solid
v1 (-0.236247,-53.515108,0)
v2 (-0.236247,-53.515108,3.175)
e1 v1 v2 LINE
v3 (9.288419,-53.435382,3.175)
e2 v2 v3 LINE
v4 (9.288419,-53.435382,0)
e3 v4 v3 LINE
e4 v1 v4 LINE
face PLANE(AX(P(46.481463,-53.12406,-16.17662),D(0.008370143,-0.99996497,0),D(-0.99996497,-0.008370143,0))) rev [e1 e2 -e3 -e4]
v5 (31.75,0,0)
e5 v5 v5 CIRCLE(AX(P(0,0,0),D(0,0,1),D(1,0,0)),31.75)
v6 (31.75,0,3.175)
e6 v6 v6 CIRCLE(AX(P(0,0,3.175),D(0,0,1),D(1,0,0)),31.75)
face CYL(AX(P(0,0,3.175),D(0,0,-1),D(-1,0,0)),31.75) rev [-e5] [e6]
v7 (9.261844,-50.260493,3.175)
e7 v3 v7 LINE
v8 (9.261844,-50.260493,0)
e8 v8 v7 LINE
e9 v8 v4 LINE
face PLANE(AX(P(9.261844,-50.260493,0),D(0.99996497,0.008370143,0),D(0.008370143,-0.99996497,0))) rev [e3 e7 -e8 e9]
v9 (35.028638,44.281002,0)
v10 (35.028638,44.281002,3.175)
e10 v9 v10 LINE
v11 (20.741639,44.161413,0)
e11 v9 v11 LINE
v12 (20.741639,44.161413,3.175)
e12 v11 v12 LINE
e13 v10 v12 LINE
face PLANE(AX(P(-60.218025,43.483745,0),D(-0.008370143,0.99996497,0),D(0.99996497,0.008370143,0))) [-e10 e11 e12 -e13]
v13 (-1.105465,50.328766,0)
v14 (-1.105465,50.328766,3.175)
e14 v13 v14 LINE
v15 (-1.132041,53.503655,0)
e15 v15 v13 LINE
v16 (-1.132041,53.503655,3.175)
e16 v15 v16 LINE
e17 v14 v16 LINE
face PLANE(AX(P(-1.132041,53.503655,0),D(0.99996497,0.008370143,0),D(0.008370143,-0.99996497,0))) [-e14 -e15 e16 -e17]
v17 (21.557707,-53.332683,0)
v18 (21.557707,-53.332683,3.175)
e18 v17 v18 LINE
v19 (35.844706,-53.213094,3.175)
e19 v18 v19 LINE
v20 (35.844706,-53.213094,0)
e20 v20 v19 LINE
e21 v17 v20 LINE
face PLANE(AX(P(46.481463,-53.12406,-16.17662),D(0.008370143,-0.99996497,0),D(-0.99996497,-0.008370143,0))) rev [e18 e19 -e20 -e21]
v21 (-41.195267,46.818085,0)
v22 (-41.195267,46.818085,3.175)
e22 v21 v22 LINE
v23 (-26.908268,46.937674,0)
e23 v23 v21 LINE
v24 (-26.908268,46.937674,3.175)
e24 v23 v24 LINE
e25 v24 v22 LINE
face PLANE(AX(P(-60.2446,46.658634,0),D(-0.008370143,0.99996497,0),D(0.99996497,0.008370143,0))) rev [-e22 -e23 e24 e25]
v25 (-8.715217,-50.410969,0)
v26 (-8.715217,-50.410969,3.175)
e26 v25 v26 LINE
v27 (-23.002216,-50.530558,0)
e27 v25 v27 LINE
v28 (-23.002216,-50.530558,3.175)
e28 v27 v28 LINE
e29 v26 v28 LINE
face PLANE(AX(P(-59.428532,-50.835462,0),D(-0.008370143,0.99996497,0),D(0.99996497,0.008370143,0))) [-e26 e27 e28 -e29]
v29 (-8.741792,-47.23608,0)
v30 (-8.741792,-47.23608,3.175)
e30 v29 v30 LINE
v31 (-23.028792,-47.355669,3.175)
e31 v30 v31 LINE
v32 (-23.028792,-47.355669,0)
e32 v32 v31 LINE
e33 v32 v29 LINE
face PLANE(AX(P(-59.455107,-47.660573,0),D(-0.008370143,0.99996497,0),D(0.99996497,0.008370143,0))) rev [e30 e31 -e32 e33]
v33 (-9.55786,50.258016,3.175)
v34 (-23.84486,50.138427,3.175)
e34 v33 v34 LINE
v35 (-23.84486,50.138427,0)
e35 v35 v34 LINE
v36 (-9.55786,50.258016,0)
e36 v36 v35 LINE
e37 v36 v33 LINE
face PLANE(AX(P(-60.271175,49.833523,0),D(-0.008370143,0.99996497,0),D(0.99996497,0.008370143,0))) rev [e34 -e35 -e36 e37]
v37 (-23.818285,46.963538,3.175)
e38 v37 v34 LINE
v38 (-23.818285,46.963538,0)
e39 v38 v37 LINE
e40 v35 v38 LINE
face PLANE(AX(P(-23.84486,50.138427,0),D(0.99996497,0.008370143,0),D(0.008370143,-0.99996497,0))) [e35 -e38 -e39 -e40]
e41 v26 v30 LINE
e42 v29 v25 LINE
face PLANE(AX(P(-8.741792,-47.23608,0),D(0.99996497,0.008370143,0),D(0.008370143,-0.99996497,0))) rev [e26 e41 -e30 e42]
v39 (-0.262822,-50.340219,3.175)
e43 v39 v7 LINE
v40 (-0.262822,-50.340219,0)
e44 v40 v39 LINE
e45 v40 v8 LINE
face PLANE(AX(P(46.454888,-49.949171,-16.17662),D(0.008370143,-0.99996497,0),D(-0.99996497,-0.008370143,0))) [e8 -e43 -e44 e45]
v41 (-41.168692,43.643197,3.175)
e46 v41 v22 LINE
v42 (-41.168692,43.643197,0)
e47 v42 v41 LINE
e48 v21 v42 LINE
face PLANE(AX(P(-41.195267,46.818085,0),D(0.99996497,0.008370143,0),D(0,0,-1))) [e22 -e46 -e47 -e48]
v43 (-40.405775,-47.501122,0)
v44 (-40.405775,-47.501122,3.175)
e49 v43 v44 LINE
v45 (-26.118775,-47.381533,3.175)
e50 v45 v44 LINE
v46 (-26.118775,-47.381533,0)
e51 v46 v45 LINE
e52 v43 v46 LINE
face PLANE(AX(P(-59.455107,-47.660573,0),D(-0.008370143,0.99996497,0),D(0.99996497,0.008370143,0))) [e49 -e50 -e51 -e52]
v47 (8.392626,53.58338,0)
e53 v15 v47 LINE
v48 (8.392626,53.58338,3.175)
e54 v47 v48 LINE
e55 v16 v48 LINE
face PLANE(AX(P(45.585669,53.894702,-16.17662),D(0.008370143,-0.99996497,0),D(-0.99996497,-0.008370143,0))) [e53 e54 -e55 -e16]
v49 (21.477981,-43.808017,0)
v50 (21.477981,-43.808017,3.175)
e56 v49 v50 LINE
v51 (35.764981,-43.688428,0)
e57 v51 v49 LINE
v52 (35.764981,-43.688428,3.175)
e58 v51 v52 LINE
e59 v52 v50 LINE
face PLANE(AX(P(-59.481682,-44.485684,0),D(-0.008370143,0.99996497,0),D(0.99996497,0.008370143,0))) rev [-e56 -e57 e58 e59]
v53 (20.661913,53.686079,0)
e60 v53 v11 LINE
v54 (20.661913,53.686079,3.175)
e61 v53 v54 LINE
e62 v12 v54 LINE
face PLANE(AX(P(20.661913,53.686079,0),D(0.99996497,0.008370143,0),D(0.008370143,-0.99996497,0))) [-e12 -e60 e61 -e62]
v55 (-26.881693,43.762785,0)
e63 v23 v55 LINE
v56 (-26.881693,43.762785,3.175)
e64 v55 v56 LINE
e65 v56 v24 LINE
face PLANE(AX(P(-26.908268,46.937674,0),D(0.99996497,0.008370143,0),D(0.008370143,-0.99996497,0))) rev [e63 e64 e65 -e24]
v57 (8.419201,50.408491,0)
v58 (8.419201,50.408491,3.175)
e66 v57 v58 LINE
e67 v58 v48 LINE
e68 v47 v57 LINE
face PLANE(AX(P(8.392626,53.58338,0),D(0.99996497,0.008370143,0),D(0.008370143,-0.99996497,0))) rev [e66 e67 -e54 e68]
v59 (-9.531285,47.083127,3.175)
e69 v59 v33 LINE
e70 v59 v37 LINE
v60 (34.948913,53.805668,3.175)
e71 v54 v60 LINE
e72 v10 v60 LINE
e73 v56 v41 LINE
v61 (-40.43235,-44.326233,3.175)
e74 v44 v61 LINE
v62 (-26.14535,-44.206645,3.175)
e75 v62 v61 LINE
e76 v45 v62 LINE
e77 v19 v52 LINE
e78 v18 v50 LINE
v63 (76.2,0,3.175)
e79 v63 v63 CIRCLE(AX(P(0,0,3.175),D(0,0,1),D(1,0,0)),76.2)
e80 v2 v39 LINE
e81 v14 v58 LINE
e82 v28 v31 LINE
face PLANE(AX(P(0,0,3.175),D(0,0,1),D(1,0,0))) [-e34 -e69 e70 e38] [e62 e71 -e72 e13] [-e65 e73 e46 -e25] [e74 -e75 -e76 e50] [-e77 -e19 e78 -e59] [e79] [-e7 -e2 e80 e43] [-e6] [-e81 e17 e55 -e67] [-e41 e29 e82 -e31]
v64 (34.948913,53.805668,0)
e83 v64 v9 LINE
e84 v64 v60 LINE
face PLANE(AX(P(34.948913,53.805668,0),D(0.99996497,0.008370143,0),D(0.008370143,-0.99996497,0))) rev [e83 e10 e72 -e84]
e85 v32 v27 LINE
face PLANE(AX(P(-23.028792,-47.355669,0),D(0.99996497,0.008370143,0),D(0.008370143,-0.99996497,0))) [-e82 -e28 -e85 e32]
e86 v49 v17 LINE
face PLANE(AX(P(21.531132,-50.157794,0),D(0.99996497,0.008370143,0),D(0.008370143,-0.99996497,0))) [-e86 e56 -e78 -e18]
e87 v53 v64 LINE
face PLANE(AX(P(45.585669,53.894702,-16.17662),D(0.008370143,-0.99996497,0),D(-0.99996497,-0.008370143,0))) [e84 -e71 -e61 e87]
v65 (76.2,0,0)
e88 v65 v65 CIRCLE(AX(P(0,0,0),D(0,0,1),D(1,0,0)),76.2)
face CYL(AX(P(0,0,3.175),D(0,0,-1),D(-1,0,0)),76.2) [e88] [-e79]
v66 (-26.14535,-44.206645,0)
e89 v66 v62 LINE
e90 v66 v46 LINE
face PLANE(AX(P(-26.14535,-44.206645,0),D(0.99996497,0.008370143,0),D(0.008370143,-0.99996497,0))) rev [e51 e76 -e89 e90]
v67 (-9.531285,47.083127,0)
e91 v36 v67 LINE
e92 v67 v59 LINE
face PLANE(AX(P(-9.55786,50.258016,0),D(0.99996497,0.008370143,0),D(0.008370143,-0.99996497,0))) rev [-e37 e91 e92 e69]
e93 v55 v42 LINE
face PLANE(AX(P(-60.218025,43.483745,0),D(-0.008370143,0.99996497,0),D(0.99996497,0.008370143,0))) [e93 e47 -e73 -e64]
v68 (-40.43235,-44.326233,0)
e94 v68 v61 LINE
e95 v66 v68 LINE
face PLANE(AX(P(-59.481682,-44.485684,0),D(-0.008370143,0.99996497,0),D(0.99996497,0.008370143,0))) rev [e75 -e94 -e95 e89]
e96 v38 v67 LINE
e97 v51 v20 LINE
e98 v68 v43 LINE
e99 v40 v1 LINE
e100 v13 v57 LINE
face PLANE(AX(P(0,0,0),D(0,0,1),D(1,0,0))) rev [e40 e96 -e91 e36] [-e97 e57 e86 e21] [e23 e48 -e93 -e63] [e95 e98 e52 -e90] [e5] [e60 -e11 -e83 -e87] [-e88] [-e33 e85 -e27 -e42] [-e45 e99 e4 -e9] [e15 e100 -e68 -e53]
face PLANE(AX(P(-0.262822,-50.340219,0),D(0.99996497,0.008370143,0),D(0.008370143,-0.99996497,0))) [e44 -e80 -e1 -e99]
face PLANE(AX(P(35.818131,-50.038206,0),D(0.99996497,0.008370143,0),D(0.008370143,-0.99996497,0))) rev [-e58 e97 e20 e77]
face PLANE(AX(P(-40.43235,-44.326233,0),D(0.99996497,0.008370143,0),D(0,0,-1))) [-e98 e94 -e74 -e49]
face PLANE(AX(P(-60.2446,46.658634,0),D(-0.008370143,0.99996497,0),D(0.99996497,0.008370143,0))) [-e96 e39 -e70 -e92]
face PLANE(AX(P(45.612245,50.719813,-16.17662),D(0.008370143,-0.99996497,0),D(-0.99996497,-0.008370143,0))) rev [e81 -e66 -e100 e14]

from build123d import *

# Parameters (mm, degrees)
SKETCH1_R           = 76.2
SKETCH1_R_2         = 31.75
BOSS_EXTRUDE1_DEPTH = 3.175
CAVITY1_START       = -53.511255689
CAVITY1_OUTLINE_W   = 14.2875
CAVITY1_OUTLINE_H   = 3.175
CAVITY1_DEPTH       = 9.525
CAVITY1_START_2     = 43.986255689
CAVITY1_2_OUTLINE_W = 14.2875
CAVITY1_2_OUTLINE_H = 3.175
CAVITY1_2_DEPTH     = 9.525
CAVITY1_START_3     = -50.336255689
CAVITY1_3_OUTLINE_W = 14.2875
CAVITY1_3_OUTLINE_H = 3.175
CAVITY1_3_DEPTH     = 3.175
CAVITY1_START_4     = -47.161255689
CAVITY1_4_OUTLINE_W = 14.2875
CAVITY1_4_OUTLINE_H = 3.175
CAVITY1_4_DEPTH     = 3.175
CAVITY1_5_OUTLINE_W = 14.2875
CAVITY1_5_OUTLINE_H = 3.175
CAVITY1_5_DEPTH     = 3.175
CAVITY1_START_5     = 47.161255689
CAVITY1_6_OUTLINE_W = 14.2875
CAVITY1_6_OUTLINE_H = 3.175
CAVITY1_6_DEPTH     = 3.175
CAVITY1_7_OUTLINE_W = 9.525
CAVITY1_7_OUTLINE_H = 3.175
CAVITY1_7_DEPTH     = 3.175
CAVITY1_START_6     = 50.336255689
CAVITY1_8_OUTLINE_W = 9.525
CAVITY1_8_OUTLINE_H = 3.175
CAVITY1_8_DEPTH     = 3.175


# Read off the part's stored shape, not the designer's step: Cavity1
with BuildPart() as part:
    # Sketch1 → Boss-Extrude1 (new body)
    with BuildSketch(Plane.XY):
        Circle(SKETCH1_R)
        Circle(SKETCH1_R_2, mode=Mode.SUBTRACT)
    extrude(amount=BOSS_EXTRUDE1_DEPTH)

    # Cavity1 outline → Cavity1 (cut)
    with BuildSketch(Plane(origin=(0, 0, 0), x_dir=(0.9999649697426024, 0.008370142631770718, 0), z_dir=(0.008370142631770716, -0.9999649697426025, 0)).offset(CAVITY1_START)):
        with Locations((28.254299641, 1.5875)):
            Rectangle(CAVITY1_OUTLINE_W, CAVITY1_OUTLINE_H)
    extrude(amount=CAVITY1_DEPTH, mode=Mode.SUBTRACT)

    # Cavity1 2 outline → Cavity1 2 (cut)
    with BuildSketch(Plane(origin=(0, 0, 0), x_dir=(0.9999649697426024, 0.008370142631770718, 0), z_dir=(0.008370142631770716, -0.9999649697426025, 0)).offset(CAVITY1_START_2)):
        with Locations((28.254299641, 1.5875)):
            Rectangle(CAVITY1_2_OUTLINE_W, CAVITY1_2_OUTLINE_H)
    extrude(amount=CAVITY1_2_DEPTH, mode=Mode.SUBTRACT)

    # Cavity1 3 outline → Cavity1 3 (cut)
    with BuildSketch(Plane(origin=(0, 0, 0), x_dir=(0.9999649697426024, 0.008370142631770718, 0), z_dir=(0.008370142631770716, -0.9999649697426025, 0)).offset(CAVITY1_START_3)):
        with Locations((-16.280608677, 1.5875)):
            Rectangle(CAVITY1_3_OUTLINE_W, CAVITY1_3_OUTLINE_H)
    extrude(amount=CAVITY1_3_DEPTH, mode=Mode.SUBTRACT)

    # Cavity1 4 outline → Cavity1 4 (cut)
    with BuildSketch(Plane(origin=(0, 0, 0), x_dir=(0.9999649697426024, 0.008370142631770718, 0), z_dir=(0.008370142631770716, -0.9999649697426025, 0)).offset(CAVITY1_START_4)):
        with Locations((-33.658200359, 1.5875)):
            Rectangle(CAVITY1_4_OUTLINE_W, CAVITY1_4_OUTLINE_H)
    extrude(amount=CAVITY1_4_DEPTH, mode=Mode.SUBTRACT)

    # Cavity1 5 outline → Cavity1 5 (cut)
    with BuildSketch(Plane(origin=(0, 0, 0), x_dir=(0.9999649697426024, 0.008370142631770718, 0), z_dir=(0.008370142631770716, -0.9999649697426025, 0)).offset(CAVITY1_START_2)):
        with Locations((-33.658200359, 1.5875)):
            Rectangle(CAVITY1_5_OUTLINE_W, CAVITY1_5_OUTLINE_H)
    extrude(amount=CAVITY1_5_DEPTH, mode=Mode.SUBTRACT)

    # Cavity1 6 outline → Cavity1 6 (cut)
    with BuildSketch(Plane(origin=(0, 0, 0), x_dir=(0.9999649697426024, 0.008370142631770718, 0), z_dir=(0.008370142631770716, -0.9999649697426025, 0)).offset(CAVITY1_START_5)):
        with Locations((-16.280608677, 1.5875)):
            Rectangle(CAVITY1_6_OUTLINE_W, CAVITY1_6_OUTLINE_H)
    extrude(amount=CAVITY1_6_DEPTH, mode=Mode.SUBTRACT)

    # Cavity1 7 outline → Cavity1 7 (cut)
    with BuildSketch(Plane(origin=(0, 0, 0), x_dir=(0.9999649697426024, 0.008370142631770718, 0), z_dir=(0.008370142631770716, -0.9999649697426025, 0)).offset(CAVITY1_START)):
        with Locations((4.078332174, 1.5875)):
            Rectangle(CAVITY1_7_OUTLINE_W, CAVITY1_7_OUTLINE_H)
    extrude(amount=CAVITY1_7_DEPTH, mode=Mode.SUBTRACT)

    # Cavity1 8 outline → Cavity1 8 (cut)
    with BuildSketch(Plane(origin=(0, 0, 0), x_dir=(0.9999649697426024, 0.008370142631770718, 0), z_dir=(0.008370142631770716, -0.9999649697426025, 0)).offset(CAVITY1_START_6)):
        with Locations((4.078332174, 1.5875)):
            Rectangle(CAVITY1_8_OUTLINE_W, CAVITY1_8_OUTLINE_H)
    extrude(amount=CAVITY1_8_DEPTH, mode=Mode.SUBTRACT)


solid = part.part
